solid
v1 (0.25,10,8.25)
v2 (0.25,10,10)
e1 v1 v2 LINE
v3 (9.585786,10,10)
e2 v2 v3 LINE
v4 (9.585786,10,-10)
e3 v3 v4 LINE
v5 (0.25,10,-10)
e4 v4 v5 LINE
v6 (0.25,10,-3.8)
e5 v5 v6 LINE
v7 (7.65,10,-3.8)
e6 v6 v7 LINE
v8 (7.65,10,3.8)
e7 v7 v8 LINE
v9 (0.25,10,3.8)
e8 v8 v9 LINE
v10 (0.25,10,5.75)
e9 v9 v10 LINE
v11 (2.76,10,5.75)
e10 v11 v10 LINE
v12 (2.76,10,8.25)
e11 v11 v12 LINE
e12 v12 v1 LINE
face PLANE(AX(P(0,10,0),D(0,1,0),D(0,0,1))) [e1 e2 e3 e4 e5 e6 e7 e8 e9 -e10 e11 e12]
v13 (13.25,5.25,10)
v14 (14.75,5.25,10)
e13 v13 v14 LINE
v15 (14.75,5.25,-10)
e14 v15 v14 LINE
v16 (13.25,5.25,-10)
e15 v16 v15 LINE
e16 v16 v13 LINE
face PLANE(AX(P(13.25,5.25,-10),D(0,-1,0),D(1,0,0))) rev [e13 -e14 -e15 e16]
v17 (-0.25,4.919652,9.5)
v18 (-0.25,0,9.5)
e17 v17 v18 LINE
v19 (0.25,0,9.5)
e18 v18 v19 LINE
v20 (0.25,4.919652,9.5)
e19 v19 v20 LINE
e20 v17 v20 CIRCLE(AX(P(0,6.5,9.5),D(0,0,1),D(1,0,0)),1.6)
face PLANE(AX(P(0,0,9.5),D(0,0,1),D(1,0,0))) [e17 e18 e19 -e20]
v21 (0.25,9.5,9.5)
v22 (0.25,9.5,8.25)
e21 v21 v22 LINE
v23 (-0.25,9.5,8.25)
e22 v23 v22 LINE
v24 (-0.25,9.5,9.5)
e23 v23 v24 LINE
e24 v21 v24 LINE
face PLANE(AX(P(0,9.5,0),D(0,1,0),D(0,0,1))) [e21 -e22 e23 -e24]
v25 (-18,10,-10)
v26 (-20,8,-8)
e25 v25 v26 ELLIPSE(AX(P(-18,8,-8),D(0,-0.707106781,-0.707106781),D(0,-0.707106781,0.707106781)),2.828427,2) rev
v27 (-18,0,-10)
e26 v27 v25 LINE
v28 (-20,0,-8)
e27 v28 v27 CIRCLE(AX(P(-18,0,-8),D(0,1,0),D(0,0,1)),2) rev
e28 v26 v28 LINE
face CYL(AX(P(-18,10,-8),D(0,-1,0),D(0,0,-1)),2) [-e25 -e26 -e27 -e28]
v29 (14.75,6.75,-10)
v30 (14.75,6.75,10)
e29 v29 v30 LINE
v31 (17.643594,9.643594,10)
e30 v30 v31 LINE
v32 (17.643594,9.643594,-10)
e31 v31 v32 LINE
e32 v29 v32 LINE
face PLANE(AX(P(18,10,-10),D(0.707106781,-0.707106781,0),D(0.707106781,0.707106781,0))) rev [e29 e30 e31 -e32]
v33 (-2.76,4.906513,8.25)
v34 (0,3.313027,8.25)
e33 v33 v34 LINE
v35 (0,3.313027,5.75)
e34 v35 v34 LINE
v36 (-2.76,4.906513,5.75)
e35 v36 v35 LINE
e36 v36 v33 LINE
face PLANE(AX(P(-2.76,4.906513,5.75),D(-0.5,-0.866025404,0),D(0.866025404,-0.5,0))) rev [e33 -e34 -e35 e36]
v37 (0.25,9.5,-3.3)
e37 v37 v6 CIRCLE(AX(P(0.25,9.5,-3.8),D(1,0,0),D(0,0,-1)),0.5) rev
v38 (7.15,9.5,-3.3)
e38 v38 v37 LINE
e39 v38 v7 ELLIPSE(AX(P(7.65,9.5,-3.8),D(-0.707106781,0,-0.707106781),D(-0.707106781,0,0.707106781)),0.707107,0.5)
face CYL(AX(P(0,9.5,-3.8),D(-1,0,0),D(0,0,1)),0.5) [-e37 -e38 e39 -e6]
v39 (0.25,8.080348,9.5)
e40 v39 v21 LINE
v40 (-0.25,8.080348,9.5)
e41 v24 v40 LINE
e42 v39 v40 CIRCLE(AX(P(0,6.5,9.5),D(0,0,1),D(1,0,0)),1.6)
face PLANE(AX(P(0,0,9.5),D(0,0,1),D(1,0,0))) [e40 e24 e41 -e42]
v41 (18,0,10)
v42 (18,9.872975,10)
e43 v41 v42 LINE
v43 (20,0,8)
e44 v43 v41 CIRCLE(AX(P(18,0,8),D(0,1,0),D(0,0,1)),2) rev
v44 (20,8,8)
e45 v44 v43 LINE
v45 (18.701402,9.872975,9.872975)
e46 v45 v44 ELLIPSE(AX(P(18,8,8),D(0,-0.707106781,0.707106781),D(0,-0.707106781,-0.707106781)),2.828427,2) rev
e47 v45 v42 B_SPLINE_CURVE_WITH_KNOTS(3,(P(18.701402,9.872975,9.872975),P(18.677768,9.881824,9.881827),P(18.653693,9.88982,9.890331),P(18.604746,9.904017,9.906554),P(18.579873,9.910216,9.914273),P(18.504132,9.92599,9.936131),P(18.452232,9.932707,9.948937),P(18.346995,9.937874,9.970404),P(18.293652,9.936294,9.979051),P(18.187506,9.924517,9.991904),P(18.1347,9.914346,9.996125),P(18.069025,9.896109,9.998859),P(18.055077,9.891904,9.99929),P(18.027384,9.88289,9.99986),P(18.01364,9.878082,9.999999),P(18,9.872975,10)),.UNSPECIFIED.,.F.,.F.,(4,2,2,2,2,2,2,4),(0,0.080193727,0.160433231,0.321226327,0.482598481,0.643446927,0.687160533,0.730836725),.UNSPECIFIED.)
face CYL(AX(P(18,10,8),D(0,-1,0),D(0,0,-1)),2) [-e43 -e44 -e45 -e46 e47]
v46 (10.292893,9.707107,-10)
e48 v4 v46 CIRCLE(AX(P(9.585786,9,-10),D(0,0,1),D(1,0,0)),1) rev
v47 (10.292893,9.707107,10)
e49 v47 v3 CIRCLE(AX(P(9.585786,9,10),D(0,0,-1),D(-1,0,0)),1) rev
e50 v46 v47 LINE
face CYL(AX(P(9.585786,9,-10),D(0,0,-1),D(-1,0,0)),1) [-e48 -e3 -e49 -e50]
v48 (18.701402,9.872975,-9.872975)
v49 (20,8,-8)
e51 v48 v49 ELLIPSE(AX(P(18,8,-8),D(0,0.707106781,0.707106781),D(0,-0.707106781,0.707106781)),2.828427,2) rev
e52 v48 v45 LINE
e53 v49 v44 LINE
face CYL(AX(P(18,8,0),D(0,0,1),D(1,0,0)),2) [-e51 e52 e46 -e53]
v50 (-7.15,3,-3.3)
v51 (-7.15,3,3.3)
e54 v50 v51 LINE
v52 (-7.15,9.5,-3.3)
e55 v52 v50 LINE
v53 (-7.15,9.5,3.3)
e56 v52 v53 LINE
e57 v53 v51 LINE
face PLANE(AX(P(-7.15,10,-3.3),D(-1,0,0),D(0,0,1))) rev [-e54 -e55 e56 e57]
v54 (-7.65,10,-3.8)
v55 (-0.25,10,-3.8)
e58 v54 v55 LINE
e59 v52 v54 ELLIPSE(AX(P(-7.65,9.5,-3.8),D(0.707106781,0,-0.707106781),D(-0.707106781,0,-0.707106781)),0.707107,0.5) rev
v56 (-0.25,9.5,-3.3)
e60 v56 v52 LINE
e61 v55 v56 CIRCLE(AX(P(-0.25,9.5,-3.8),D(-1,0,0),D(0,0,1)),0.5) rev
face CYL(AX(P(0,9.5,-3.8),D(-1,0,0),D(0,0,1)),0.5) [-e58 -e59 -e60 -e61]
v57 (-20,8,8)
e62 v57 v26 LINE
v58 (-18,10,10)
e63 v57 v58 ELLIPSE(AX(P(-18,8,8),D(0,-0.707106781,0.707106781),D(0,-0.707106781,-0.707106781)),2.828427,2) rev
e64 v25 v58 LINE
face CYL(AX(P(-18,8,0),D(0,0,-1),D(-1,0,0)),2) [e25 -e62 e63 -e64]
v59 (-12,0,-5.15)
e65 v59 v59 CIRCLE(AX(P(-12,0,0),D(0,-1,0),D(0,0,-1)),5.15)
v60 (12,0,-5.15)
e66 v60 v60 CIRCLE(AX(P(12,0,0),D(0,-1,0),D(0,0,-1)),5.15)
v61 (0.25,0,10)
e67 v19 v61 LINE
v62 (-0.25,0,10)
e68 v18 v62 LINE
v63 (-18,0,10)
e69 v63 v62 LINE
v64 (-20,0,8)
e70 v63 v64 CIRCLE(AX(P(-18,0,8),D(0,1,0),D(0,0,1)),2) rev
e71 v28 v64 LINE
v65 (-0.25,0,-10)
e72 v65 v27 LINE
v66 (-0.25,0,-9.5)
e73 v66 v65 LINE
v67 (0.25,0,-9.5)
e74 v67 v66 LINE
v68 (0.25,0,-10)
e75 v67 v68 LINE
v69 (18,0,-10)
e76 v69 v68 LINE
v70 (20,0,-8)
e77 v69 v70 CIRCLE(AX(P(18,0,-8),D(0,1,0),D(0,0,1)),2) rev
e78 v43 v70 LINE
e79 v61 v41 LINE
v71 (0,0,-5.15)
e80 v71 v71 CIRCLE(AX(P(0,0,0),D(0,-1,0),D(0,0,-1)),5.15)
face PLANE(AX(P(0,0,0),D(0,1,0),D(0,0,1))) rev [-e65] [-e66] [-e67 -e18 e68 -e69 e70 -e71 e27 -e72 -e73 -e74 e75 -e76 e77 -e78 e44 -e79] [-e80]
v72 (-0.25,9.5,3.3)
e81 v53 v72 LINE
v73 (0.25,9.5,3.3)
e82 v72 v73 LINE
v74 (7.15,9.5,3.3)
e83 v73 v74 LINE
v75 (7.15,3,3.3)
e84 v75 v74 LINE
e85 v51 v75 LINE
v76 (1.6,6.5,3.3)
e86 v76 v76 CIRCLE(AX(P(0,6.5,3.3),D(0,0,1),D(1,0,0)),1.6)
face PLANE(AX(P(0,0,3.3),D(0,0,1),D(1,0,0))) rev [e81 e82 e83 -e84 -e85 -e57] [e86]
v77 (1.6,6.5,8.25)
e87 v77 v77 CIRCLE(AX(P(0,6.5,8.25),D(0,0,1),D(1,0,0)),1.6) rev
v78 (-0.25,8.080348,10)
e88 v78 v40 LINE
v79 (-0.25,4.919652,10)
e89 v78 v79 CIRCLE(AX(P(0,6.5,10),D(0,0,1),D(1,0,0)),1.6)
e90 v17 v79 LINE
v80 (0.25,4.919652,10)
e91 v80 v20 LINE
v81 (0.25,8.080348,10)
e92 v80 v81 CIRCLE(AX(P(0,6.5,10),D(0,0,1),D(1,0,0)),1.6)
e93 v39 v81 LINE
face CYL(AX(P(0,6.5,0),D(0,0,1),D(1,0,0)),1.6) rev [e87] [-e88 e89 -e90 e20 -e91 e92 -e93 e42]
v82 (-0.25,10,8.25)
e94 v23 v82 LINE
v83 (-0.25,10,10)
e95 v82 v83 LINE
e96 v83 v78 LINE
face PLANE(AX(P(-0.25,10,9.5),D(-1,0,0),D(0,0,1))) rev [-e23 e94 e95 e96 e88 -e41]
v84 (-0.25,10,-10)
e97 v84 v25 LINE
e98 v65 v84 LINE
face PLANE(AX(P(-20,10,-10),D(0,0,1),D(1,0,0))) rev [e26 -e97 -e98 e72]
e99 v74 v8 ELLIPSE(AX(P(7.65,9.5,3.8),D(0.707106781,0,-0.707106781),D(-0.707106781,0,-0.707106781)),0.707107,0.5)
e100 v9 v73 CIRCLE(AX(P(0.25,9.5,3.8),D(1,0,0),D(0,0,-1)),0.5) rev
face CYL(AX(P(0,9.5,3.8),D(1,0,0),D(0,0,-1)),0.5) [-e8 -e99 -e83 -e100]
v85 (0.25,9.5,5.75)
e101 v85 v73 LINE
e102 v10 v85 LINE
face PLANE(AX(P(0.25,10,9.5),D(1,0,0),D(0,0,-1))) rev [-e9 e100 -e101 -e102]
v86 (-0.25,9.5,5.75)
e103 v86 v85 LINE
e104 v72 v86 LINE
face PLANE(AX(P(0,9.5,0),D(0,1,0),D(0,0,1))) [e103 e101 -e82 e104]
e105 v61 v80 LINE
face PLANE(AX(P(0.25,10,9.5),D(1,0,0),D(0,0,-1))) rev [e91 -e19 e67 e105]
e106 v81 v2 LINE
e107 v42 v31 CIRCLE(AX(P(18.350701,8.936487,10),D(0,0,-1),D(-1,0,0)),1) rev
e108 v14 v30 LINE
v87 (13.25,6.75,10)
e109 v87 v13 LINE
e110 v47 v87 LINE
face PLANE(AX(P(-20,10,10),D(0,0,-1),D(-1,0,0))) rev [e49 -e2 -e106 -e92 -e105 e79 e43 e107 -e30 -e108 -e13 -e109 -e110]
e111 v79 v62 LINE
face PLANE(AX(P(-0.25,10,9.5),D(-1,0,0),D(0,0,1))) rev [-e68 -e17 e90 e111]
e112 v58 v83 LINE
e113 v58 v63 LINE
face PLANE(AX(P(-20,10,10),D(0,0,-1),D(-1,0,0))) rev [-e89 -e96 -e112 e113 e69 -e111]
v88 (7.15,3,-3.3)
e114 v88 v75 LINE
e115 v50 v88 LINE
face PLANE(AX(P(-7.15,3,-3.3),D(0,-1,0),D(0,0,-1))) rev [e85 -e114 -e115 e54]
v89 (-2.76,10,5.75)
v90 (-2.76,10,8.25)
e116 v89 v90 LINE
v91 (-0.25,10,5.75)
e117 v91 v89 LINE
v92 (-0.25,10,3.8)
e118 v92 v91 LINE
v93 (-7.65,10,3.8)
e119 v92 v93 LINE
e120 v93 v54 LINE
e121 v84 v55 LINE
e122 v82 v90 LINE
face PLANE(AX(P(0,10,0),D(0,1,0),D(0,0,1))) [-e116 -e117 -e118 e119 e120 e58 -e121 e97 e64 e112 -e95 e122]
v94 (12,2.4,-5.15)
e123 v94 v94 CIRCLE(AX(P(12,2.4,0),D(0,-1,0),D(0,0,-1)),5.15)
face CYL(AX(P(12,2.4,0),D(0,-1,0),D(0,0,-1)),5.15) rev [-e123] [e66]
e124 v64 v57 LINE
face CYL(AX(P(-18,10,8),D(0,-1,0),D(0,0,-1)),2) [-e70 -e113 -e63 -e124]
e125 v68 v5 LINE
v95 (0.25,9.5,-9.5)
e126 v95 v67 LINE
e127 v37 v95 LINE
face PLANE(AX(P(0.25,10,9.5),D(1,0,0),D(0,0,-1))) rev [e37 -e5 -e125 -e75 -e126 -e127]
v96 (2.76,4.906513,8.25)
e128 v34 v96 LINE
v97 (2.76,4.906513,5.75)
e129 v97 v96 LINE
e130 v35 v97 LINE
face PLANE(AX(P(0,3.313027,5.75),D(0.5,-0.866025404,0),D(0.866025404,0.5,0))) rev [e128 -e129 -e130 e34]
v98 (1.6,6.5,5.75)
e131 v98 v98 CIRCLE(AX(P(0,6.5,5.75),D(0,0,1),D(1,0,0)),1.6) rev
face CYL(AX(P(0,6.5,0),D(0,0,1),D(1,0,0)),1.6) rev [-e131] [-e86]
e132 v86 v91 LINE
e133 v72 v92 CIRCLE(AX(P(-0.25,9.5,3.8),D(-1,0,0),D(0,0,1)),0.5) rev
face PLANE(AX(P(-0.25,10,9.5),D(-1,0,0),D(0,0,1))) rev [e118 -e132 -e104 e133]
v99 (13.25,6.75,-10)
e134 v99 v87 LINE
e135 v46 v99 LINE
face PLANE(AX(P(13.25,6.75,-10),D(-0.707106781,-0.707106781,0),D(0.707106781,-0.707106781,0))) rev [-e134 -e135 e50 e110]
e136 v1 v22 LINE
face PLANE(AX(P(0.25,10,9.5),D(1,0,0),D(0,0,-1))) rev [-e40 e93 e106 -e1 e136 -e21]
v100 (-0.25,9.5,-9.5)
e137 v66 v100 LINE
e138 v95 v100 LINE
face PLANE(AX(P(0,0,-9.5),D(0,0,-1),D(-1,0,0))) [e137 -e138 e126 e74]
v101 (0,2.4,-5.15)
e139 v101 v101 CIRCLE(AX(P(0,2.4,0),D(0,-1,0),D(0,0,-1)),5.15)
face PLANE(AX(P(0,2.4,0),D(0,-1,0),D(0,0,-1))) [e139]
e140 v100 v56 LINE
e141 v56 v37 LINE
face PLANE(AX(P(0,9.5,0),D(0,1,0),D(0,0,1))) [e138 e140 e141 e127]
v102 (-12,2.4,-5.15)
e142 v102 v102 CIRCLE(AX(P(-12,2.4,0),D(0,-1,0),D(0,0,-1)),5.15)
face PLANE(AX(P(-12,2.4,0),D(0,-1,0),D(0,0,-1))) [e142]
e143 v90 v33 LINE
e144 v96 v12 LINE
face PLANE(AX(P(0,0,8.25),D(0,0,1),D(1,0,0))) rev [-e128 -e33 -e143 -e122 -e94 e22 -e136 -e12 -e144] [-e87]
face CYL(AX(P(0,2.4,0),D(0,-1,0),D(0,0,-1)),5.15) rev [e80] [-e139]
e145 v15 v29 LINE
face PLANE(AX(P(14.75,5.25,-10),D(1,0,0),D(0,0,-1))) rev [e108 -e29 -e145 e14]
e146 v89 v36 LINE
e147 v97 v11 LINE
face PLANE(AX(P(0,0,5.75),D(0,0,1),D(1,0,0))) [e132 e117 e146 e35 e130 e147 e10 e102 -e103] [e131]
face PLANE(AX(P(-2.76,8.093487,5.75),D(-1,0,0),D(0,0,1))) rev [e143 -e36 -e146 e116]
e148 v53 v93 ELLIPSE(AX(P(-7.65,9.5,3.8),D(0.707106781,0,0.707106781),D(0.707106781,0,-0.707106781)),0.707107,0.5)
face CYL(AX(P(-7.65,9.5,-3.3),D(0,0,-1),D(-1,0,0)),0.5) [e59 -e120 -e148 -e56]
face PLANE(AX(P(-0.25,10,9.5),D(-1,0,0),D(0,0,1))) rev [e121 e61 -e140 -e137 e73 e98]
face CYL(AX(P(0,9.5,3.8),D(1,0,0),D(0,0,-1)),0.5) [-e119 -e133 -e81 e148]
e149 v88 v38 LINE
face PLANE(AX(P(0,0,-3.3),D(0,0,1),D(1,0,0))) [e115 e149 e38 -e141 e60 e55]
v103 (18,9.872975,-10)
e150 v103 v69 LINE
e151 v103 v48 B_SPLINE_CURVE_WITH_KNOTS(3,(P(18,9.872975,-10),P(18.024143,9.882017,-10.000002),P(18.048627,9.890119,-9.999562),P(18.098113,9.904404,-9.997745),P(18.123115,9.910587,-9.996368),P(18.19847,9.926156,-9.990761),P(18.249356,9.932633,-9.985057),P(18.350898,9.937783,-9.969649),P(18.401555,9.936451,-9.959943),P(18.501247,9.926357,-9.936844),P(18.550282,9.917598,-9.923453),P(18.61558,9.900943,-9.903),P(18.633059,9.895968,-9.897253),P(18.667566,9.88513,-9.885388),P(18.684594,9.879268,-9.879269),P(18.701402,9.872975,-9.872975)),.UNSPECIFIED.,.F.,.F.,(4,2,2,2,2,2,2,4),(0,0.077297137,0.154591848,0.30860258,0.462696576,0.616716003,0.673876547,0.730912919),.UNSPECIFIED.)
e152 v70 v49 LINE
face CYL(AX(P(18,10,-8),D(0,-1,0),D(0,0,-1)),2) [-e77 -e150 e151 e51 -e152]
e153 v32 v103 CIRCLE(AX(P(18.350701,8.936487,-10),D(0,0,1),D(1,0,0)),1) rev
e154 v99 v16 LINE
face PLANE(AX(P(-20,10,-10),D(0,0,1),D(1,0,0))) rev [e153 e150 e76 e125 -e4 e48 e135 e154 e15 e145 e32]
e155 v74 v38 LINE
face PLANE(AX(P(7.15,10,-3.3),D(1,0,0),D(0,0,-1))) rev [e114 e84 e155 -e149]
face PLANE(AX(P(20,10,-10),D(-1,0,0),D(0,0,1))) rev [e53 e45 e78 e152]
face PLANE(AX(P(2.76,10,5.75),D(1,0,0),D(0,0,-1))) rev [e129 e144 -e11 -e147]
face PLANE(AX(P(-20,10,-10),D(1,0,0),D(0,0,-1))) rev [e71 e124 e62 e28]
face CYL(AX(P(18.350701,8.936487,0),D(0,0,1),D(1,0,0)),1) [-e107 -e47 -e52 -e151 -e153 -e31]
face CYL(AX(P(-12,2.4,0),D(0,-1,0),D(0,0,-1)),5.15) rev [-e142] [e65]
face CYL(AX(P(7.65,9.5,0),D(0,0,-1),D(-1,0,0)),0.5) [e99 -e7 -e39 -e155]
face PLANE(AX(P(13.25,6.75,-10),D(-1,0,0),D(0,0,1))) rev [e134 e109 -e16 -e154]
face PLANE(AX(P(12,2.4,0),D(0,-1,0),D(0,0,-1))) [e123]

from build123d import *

# Parameters (mm, degrees)
SKETCH1_W           = 40
SKETCH1_H           = 20
BOSS_EXTRUDE1_DEPTH = 10
SKETCH2_R           = 5.15
CUT_EXTRUDE1_DEPTH  = 2.4
CUT_EXTRUDE2_DEPTH  = 31
FILLET1_R           = 2
SKETCH4_W           = 0.5
SKETCH4_H           = 10
CUT_EXTRUDE3_DEPTH  = 0.5
SKETCH5_W           = 0.5
SKETCH5_H           = 20
CUT_EXTRUDE4_DEPTH  = 0.5
SKETCH6_W           = 0.5
SKETCH6_H           = 10
CUT_EXTRUDE5_DEPTH  = 0.5
FILLET2_R           = 1
SKETCH8_W           = 14.3
SKETCH8_H           = 7
CUT_EXTRUDE7_DEPTH  = 3.3
SKETCH9_R           = 1.6
CUT_EXTRUDE8_DEPTH  = 10
CUT_EXTRUDE9_DEPTH  = 1.25
FILLET4_R           = 0.5


# Some blends are built 0.0001 mm under size
with BuildPart() as part:
    # Sketch1 → Boss-Extrude1 (new body)
    with BuildSketch(Plane(origin=(0, 0, 0), x_dir=(1, 0, 0), z_dir=(0, 1, 0))):
        Rectangle(SKETCH1_W, SKETCH1_H)
    extrude(amount=BOSS_EXTRUDE1_DEPTH)

    # Sketch2 → Cut-Extrude1 (cut)
    with BuildSketch(Plane.XZ):
        with Locations(Location((0, 0, 0), (0, 0, 270))):
            Circle(SKETCH2_R)
        with Locations(Location((12, 0, 0), (0, 0, 270))):
            Circle(SKETCH2_R)
        with Locations(Location((-12, 0, 0), (0, 0, 270))):
            Circle(SKETCH2_R)
    extrude(amount=-CUT_EXTRUDE1_DEPTH, mode=Mode.SUBTRACT)

    # Sketch3 → Cut-Extrude2 (cut, through all)
    with BuildSketch(Plane.XY.offset(10)):
        Polygon((18, 10), (14.75, 6.75), (14.75, 5.25), (13.25, 5.25), (13.25, 6.75), (10, 10), align=None)
    extrude(amount=-CUT_EXTRUDE2_DEPTH, mode=Mode.SUBTRACT)

    # Fillet1
    fillet1_edges = [part.edges().sort_by_distance(p)[0] for p in [
        (20, 10, 0),
        (-20, 10, 0),
        (-20, 5, -10),
        (20, 5, -10),
        (20, 5, 10),
        (-20, 5, 10),
    ]]
    fillet(fillet1_edges, radius=FILLET1_R - 0.0001)  # a hair under: the kernel refuses the full size

    # Sketch4 → Cut-Extrude3 (cut)
    with BuildSketch(Plane.XY.offset(10)):
        with Locations((0, 5)):
            Rectangle(SKETCH4_W, SKETCH4_H)
    extrude(amount=-CUT_EXTRUDE3_DEPTH, mode=Mode.SUBTRACT)

    # Sketch5 → Cut-Extrude4 (cut)
    with BuildSketch(Plane(origin=(0, 10, 0), x_dir=(1, 0, 0), z_dir=(0, 1, 0))):
        Rectangle(SKETCH5_W, SKETCH5_H)
    extrude(amount=-CUT_EXTRUDE4_DEPTH, mode=Mode.SUBTRACT)

    # Sketch6 → Cut-Extrude5 (cut)
    with BuildSketch(Plane(origin=(0, 0, -10), x_dir=(-1, 0, 0), z_dir=(0, 0, -1))):
        with Locations((0, 5)):
            Rectangle(SKETCH6_W, SKETCH6_H)
    extrude(amount=-CUT_EXTRUDE5_DEPTH, mode=Mode.SUBTRACT)

    # Fillet2
    # the kernel refuses this fillet: 1 mm, written as the material it takes off along each edge
    with BuildSketch(Plane(origin=(10, 10, 11.035533906), x_dir=(0.7071067811865476, -0.7071067811865476, 0), z_dir=(0, 0, -1))) as fillet2_piece_1:
        with BuildLine():
            CenterArc((FILLET2_R * 0.414213562373, FILLET2_R), FILLET2_R, 225, 45)
            Line((-FILLET2_R * 0.292893218813, FILLET2_R * 0.292893218813), (0, 0))
            Line((0, 0), (FILLET2_R * 0.414213562373, 0))
        make_face()
    extrude(amount=22.071067812, mode=Mode.SUBTRACT)
    with BuildSketch(Plane(origin=(18, 10, 11.781961717), x_dir=(-0.7071067811865406, -0.7071067811865547, 0), z_dir=(0, 0, -1))) as fillet2_piece_2:
        with BuildLine():
            CenterArc((0.504002289, -1), FILLET2_R, 90, 65.527591719)
            Line((-0.406158578, -0.585745012), (-0.497174665, -0.544319513))
            ThreePointArc((-0.497174665, -0.544319513), (-0.070781389, 0.070639967), (-0.070710678, 0.070710678))
            Line((-0.070710678, 0.070710678), (0, 0.1))
            Line((0, 0.1), (0.504002289, 0.1))
            Line((0.504002289, 0.1), (0.504002289, 0))
        make_face()
    extrude(amount=23.563923435, mode=Mode.SUBTRACT)

    # Sketch8 → Cut-Extrude7 (cut, symmetric)
    with BuildSketch(Plane.XY):
        with Locations((0, 6.5)):
            Rectangle(SKETCH8_W, SKETCH8_H)
    extrude(amount=CUT_EXTRUDE7_DEPTH, both=True, mode=Mode.SUBTRACT)

    # Sketch9 → Cut-Extrude8 (cut)
    with BuildSketch(Plane.XY.offset(10)):
        with Locations((0, 6.5)):
            Circle(SKETCH9_R)
    extrude(amount=-CUT_EXTRUDE8_DEPTH, mode=Mode.SUBTRACT)

    # Sketch10 → Cut-Extrude9 (cut, symmetric)
    with BuildSketch(Plane.XY.offset(7)):
        Polygon((-2.76, 8.093486743), (-2.76, 10), (2.76, 10), (2.76, 8.081939738), (2.76, 4.906513257), (0, 3.313026514), (-2.76, 4.906513257), align=None)
    extrude(amount=CUT_EXTRUDE9_DEPTH, both=True, mode=Mode.SUBTRACT)

    # Fillet4
    fillet4_edges = [part.edges().sort_by_distance(p)[0] for p in [
        (3.7, 10, -3.3),
        (7.15, 10, 0),
        (3.7, 10, 3.3),
        (-3.7, 10, 3.3),
        (-7.15, 10, 0),
        (-3.7, 10, -3.3),
    ]]
    fillet(fillet4_edges, radius=FILLET4_R)


solid = part.part
